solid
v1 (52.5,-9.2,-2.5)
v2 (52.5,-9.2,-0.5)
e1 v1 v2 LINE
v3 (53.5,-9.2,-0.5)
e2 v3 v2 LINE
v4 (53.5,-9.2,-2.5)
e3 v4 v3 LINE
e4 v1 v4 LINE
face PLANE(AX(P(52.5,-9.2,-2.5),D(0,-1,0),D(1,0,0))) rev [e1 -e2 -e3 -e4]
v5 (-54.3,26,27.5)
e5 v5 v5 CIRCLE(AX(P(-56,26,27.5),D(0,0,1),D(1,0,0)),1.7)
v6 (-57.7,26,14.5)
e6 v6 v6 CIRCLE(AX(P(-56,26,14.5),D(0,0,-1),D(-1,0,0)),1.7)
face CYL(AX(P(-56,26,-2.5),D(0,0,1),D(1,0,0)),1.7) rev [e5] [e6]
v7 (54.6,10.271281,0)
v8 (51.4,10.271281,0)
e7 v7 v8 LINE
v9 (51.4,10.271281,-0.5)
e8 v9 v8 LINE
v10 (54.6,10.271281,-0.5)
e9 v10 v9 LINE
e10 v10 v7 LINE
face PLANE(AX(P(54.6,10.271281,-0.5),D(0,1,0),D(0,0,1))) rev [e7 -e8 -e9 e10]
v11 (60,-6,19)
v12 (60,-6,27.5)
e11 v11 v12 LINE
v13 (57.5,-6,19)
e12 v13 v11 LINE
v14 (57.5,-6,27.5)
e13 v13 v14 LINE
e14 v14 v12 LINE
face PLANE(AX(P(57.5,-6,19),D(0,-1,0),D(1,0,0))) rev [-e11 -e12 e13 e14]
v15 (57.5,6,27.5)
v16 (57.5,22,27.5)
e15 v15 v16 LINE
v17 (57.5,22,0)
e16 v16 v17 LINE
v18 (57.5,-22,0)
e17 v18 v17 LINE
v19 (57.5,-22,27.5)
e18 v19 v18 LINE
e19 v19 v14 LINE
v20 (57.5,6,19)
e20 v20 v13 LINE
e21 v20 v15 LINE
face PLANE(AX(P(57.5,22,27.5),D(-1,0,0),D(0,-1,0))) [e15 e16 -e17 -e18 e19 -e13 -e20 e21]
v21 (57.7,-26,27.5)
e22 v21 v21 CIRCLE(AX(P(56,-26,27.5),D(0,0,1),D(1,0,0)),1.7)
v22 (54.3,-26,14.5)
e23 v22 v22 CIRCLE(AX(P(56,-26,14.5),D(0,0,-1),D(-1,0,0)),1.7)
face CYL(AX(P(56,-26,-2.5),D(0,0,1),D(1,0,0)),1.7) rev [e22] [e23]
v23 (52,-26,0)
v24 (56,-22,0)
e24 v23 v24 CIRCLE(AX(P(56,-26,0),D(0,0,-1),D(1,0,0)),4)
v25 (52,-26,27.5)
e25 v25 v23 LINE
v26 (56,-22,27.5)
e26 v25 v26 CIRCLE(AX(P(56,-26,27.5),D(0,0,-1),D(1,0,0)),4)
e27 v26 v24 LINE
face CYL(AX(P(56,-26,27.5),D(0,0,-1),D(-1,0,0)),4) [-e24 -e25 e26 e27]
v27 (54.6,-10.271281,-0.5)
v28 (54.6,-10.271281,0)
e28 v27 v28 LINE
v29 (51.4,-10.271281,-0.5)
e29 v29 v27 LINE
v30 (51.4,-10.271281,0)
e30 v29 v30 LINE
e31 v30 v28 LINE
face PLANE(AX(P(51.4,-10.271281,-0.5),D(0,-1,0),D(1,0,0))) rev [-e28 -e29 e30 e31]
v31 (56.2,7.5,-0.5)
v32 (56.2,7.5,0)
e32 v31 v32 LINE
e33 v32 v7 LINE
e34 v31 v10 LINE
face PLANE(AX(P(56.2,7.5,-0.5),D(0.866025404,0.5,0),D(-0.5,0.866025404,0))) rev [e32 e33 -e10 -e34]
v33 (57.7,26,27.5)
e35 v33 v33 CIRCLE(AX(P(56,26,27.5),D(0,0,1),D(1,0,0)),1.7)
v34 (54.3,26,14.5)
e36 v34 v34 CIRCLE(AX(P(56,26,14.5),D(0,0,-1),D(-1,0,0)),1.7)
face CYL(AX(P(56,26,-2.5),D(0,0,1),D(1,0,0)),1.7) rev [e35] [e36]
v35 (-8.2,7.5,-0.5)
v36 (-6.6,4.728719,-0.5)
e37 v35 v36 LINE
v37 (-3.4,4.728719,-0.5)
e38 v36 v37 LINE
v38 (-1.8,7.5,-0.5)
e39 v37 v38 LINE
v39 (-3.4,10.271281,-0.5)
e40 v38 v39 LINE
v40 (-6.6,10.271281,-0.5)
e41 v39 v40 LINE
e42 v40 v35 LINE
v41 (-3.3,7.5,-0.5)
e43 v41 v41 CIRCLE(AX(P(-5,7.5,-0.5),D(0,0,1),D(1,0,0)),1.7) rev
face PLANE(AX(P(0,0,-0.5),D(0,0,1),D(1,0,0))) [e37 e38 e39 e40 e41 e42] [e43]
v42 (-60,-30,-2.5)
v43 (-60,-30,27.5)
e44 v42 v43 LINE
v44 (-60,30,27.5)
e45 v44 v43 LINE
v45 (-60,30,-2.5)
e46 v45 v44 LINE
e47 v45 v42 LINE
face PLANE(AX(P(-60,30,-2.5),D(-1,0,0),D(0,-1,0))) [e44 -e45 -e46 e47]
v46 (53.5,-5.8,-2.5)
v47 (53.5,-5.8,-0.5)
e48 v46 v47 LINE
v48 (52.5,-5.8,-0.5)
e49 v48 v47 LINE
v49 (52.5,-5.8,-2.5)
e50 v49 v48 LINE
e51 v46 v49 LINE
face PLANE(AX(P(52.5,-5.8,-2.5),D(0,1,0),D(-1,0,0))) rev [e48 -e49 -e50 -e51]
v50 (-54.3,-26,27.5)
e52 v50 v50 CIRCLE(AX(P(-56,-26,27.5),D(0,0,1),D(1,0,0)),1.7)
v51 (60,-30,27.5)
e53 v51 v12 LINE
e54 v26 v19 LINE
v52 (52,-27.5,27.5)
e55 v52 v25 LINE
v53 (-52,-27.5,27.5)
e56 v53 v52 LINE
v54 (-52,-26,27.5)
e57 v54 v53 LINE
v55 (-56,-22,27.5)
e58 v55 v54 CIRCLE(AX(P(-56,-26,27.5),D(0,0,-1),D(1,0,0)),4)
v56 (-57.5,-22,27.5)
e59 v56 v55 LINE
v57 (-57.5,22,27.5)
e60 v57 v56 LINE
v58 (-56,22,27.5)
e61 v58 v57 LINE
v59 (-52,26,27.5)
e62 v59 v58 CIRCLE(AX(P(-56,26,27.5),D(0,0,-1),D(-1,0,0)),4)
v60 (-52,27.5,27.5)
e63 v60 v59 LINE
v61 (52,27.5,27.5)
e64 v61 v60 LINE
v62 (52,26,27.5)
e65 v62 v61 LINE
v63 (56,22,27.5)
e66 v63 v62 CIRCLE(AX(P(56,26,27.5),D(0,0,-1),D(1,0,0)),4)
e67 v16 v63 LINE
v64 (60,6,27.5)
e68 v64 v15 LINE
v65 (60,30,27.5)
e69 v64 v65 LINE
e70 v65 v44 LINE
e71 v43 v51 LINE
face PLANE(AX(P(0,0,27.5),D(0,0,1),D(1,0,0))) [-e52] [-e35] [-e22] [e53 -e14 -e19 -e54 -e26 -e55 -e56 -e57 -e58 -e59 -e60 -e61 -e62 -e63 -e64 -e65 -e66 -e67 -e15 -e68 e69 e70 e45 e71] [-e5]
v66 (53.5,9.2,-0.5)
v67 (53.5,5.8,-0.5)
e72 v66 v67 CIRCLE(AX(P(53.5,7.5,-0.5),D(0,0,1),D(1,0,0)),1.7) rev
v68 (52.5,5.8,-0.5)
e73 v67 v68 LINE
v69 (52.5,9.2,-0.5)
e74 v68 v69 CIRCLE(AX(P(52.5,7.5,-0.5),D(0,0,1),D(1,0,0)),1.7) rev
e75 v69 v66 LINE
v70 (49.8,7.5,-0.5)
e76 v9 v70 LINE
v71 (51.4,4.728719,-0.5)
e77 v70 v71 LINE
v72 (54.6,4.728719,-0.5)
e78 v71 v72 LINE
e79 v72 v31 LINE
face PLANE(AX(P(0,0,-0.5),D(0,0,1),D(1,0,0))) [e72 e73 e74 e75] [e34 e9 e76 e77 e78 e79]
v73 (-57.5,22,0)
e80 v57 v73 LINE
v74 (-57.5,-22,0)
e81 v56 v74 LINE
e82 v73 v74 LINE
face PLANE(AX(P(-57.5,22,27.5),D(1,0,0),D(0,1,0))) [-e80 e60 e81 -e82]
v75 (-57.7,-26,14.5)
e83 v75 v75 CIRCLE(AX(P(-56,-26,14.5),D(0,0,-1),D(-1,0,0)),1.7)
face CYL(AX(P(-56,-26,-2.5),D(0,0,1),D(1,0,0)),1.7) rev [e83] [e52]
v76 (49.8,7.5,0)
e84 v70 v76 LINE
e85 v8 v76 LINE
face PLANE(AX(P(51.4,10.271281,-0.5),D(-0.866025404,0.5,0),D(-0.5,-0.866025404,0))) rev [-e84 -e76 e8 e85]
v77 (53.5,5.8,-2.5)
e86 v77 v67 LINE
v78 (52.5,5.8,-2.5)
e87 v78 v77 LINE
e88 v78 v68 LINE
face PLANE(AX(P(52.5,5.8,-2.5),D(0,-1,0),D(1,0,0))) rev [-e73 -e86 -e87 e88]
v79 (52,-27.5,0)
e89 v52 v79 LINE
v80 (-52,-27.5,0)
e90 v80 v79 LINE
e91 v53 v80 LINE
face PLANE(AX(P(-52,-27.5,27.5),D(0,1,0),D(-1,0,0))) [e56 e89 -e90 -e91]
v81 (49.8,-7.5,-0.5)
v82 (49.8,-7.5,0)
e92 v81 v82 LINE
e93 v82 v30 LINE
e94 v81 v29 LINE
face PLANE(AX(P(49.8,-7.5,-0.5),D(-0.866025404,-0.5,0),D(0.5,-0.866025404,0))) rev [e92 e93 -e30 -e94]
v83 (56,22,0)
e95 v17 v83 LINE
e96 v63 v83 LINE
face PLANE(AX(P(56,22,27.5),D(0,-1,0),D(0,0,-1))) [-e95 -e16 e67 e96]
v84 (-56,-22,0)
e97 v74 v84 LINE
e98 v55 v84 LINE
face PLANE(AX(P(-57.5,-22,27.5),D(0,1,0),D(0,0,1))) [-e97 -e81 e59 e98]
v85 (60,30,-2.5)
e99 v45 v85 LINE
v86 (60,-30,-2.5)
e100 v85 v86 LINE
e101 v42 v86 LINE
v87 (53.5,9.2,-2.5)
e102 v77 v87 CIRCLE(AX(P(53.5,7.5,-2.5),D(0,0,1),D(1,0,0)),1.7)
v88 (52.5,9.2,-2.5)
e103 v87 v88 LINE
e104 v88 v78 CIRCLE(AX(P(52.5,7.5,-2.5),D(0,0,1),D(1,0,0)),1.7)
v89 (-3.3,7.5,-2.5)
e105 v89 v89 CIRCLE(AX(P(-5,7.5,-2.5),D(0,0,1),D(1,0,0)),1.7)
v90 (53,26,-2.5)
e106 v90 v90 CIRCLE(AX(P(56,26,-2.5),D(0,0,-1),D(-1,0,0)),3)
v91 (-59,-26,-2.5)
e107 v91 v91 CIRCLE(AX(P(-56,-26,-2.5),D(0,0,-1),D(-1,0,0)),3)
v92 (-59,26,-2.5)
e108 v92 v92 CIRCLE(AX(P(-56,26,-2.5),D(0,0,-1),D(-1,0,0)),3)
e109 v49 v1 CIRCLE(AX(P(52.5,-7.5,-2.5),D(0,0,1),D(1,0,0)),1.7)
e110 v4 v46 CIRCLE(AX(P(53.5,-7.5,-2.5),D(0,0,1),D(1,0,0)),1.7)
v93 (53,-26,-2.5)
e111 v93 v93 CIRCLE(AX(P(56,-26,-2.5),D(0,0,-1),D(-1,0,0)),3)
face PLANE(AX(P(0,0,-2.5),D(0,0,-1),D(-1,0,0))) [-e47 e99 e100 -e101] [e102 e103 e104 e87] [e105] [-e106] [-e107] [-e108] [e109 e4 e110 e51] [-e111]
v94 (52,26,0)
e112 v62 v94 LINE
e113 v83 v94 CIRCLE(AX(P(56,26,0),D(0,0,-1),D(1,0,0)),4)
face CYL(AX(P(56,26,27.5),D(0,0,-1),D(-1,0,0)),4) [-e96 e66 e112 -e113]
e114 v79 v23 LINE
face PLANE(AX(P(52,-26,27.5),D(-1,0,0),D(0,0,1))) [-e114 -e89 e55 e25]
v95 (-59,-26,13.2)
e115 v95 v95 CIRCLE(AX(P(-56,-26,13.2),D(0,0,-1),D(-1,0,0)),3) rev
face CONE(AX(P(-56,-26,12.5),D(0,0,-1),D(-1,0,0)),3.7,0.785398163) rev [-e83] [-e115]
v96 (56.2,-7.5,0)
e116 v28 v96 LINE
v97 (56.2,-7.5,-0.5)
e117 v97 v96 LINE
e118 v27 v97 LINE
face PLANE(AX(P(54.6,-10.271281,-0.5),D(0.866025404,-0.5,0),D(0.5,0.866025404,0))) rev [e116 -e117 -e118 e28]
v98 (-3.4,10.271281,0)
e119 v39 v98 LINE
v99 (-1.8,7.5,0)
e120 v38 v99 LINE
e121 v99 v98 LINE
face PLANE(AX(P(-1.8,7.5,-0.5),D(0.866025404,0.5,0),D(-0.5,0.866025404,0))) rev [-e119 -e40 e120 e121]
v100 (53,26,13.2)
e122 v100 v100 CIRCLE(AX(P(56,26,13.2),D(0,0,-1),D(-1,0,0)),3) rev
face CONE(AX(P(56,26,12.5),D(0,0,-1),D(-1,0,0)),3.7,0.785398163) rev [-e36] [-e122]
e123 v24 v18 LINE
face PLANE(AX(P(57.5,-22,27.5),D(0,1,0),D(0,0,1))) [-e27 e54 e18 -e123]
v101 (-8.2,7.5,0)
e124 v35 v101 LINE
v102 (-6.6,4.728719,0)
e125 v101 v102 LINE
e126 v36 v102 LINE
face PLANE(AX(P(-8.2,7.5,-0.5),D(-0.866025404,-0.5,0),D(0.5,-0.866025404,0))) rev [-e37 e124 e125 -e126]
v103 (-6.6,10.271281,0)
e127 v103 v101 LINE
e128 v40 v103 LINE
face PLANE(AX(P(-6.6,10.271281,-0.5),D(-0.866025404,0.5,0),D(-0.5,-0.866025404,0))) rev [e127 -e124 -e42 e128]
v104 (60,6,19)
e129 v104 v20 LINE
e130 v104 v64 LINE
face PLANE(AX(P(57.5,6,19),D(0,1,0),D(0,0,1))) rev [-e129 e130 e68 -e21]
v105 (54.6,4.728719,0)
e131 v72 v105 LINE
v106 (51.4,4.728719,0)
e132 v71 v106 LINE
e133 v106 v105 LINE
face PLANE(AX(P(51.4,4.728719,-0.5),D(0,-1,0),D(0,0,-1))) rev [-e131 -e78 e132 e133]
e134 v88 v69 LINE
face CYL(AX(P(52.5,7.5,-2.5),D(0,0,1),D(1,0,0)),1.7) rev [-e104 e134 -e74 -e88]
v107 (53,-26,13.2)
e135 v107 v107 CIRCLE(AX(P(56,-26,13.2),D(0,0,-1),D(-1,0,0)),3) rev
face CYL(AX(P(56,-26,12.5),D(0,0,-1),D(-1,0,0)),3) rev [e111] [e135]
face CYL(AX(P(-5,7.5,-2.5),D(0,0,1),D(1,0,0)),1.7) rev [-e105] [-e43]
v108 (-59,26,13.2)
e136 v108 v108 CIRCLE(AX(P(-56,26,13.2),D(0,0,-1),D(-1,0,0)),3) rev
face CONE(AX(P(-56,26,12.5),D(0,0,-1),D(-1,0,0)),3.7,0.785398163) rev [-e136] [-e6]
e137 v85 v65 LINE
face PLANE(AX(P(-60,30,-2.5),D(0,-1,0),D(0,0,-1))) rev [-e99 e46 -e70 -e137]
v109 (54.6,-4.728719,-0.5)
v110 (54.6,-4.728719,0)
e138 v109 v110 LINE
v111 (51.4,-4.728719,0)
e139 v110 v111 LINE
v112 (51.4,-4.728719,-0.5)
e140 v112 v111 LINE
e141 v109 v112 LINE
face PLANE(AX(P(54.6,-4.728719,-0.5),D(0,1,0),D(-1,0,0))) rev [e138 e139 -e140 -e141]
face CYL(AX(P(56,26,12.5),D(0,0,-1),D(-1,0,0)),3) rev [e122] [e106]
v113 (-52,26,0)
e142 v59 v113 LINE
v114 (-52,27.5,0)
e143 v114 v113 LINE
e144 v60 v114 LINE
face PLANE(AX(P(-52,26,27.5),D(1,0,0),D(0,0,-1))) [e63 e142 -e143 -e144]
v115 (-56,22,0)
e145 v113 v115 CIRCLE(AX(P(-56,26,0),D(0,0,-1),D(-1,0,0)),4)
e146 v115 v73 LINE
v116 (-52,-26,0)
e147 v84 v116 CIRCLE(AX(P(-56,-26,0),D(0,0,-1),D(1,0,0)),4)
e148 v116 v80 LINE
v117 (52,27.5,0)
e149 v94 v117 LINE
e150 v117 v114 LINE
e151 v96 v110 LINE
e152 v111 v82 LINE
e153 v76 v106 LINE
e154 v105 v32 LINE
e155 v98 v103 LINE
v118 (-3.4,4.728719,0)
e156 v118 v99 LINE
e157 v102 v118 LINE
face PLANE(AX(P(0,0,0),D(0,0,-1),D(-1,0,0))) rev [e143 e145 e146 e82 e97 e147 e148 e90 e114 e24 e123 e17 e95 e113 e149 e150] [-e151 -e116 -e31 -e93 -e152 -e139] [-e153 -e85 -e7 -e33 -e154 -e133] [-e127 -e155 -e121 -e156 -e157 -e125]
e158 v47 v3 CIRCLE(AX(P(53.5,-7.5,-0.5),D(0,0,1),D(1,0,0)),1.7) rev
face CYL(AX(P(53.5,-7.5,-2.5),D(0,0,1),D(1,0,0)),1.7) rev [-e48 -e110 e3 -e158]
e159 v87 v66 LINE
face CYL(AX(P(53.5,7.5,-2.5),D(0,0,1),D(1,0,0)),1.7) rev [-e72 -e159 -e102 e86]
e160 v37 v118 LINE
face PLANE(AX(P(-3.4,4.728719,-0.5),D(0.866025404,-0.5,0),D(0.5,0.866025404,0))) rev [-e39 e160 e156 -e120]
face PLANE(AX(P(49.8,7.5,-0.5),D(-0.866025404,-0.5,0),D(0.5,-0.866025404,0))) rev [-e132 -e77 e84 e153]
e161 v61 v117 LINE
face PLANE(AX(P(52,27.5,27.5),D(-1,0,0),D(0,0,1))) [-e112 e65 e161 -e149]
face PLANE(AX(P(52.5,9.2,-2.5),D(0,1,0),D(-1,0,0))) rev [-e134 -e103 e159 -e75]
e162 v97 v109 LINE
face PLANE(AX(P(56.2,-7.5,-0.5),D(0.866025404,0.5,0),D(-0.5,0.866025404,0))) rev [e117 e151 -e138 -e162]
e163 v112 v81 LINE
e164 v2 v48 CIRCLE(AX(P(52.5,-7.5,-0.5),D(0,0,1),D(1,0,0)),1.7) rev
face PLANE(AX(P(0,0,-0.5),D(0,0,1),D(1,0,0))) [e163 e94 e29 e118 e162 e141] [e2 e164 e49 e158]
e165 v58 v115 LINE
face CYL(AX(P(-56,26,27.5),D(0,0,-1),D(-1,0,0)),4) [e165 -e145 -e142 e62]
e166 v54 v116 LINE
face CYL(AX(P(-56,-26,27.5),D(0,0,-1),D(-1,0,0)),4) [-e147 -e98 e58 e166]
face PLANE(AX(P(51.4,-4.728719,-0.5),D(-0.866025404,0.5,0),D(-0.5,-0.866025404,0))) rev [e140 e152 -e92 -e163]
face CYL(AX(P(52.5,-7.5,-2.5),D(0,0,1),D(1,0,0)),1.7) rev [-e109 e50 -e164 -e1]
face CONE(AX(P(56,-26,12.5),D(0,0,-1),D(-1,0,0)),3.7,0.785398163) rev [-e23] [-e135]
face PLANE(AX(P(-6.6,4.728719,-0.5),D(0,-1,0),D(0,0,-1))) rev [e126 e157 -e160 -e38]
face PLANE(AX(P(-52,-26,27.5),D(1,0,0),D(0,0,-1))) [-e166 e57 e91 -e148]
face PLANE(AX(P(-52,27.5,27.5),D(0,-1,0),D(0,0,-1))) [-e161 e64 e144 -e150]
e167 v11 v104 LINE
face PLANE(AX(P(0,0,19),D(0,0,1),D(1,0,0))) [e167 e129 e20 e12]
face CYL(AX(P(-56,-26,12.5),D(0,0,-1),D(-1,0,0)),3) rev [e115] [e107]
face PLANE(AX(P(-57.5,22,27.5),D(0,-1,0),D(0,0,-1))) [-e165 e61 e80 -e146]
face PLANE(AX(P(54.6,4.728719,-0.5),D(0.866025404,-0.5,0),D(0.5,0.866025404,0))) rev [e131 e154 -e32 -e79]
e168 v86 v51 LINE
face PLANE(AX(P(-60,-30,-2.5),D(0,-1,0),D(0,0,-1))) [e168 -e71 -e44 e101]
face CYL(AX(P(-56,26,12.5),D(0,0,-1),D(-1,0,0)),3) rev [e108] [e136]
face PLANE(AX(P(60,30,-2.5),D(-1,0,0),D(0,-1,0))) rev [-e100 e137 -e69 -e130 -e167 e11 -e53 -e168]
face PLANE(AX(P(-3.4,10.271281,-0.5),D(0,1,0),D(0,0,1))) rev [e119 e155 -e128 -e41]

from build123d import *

# Parameters (mm, degrees)
SKETCH_1_W          = 120
SKETCH_1_H          = 60
EXTRUDE_1_DEPTH     = 2.5
SKETCH_1_3_W        = 120
SKETCH_1_3_H        = 60
EXTRUDE_2_DEPTH     = 27.5
SKETCH_2_R          = 1.7
CUT_EXTRUDE_1_DEPTH = 74.484692283
SKETCH_3_R          = 1.7
CUT_EXTRUDE_2_DEPTH = 73.5
CUT_EXTRUDE_3_DEPTH = 0.5
SKETCH_5_W          = 2.5
SKETCH_5_H          = 12
CUT_EXTRUDE_4_DEPTH = 8.5
SKETCH_6_R          = 3
CUT_EXTRUDE_5_DEPTH = 15
CHAMFER_1_SIZE      = 2


with BuildPart() as part:
    # 草图1 → 凸台-拉伸1 (new body)
    with BuildSketch(Plane.XY):
        Rectangle(SKETCH_1_W, SKETCH_1_H)
    extrude(amount=-EXTRUDE_1_DEPTH)

    # 草图1<3> → 凸台-拉伸2 (add)
    with BuildSketch(Plane.XY):
        Rectangle(SKETCH_1_3_W, SKETCH_1_3_H)
        with BuildLine():
            Line((-52, 27.5), (52, 27.5))
            Line((52, 27.5), (52, 26))
            ThreePointArc((52, 26), (53.171572875, 23.171572875), (56, 22))
            Line((56, 22), (57.5, 22))
            Line((57.5, 22), (57.5, -22))
            Line((57.5, -22), (56, -22))
            ThreePointArc((56, -22), (53.171572875, -23.171572875), (52, -26))
            Line((52, -26), (52, -27.5))
            Line((52, -27.5), (-52, -27.5))
            Line((-52, -27.5), (-52, -26))
            ThreePointArc((-52, -26), (-53.171572875, -23.171572875), (-56, -22))
            Line((-56, -22), (-57.5, -22))
            Line((-57.5, -22), (-57.5, 22))
            Line((-57.5, 22), (-56, 22))
            ThreePointArc((-56, 22), (-53.171572875, 23.171572875), (-52, 26))
            Line((-52, 26), (-52, 27.5))
        make_face(mode=Mode.SUBTRACT)
    extrude(amount=EXTRUDE_2_DEPTH)

    # 草图2 → 切除-拉伸1 (cut, through all)
    with BuildSketch(Plane.XY.offset(27.5)):
        with Locations((-56, 26)):
            Circle(SKETCH_2_R)
        with Locations((56, 26)):
            Circle(SKETCH_2_R)
        with Locations((56, -26)):
            Circle(SKETCH_2_R)
        with Locations((-56, -26)):
            Circle(SKETCH_2_R)
    extrude(amount=-CUT_EXTRUDE_1_DEPTH, mode=Mode.SUBTRACT)

    # 草图3 → 切除-拉伸2 (cut, through all)
    with BuildSketch(Plane.XY):
        with Locations((-5, 7.5)):
            Circle(SKETCH_3_R)
        with BuildLine():
            Line((52.5, 9.2), (53.5, 9.2))
            ThreePointArc((53.5, 9.2), (55.2, 7.5), (53.5, 5.8))
            Line((53.5, 5.8), (52.5, 5.8))
            ThreePointArc((52.5, 5.8), (50.8, 7.5), (52.5, 9.2))
        make_face()
        with BuildLine():
            Line((52.5, -5.8), (53.5, -5.8))
            ThreePointArc((53.5, -5.8), (55.2, -7.5), (53.5, -9.2))
            Line((53.5, -9.2), (52.5, -9.2))
            ThreePointArc((52.5, -9.2), (50.8, -7.5), (52.5, -5.8))
        make_face()
    extrude(amount=-CUT_EXTRUDE_2_DEPTH, mode=Mode.SUBTRACT)

    # 草图4 → 切除-拉伸3 (cut)
    with BuildSketch(Plane.XY):
        Polygon((-1.8, 7.5), (-3.4, 10.271281292), (-6.6, 10.271281292), (-8.2, 7.5), (-6.6, 4.728718708), (-3.4, 4.728718708), align=None)
        Polygon((56.2, 7.5), (54.6, 10.271281292), (51.4, 10.271281292), (49.8, 7.5), (51.4, 4.728718708), (54.6, 4.728718708), align=None)
        Polygon((56.2, -7.5), (54.6, -4.728718708), (51.4, -4.728718708), (49.8, -7.5), (51.4, -10.271281292), (54.6, -10.271281292), align=None)
    extrude(amount=-CUT_EXTRUDE_3_DEPTH, mode=Mode.SUBTRACT)

    # 草图5 → 切除-拉伸4 (cut)
    with BuildSketch(Plane.XY.offset(27.5)):
        with Locations((58.75, 0)):
            Rectangle(SKETCH_5_W, SKETCH_5_H)
    extrude(amount=-CUT_EXTRUDE_4_DEPTH, mode=Mode.SUBTRACT)

    # 草图6 → 切除-拉伸5 (cut)
    with BuildSketch(Plane(origin=(0, 0, -2.5), x_dir=(-1, 0, 0), z_dir=(0, 0, -1))):
        with Locations((-56, 26)):
            Circle(SKETCH_6_R)
        with Locations((-56, -26)):
            Circle(SKETCH_6_R)
        with Locations((56, -26)):
            Circle(SKETCH_6_R)
        with Locations((56, 26)):
            Circle(SKETCH_6_R)
    extrude(amount=-CUT_EXTRUDE_5_DEPTH, mode=Mode.SUBTRACT)

    # 倒角1
    # the kernel refuses this chamfer: 2 mm, written as the material it takes off along each edge
    with BuildSketch(Plane(origin=(-56, 26, 12.5), x_dir=(1, 0, 0), z_dir=(0, -1, 0))) as chamfer_1_piece_1_section:
        Polygon((1.7, CHAMFER_1_SIZE), (1.7 + CHAMFER_1_SIZE, 0), (1.7, 0), align=None)
    chamfer_1_piece_1 = revolve(axis=Axis((-56, 26, 12.5), (0, 0, 1)), mode=Mode.PRIVATE)
    chamfer_1_piece_1 = chamfer_1_piece_1 & Plane(origin=(-56, 26, 13.857190975), x_dir=(-1, 0, 0), z_dir=(0, 0, -1)) * Cylinder(3, 15, mode=Mode.PRIVATE)
    add(chamfer_1_piece_1, mode=Mode.SUBTRACT)
    with BuildSketch(Plane(origin=(-56, -26, 12.5), x_dir=(1, 0, 0), z_dir=(0, -1, 0))) as chamfer_1_piece_2_section:
        Polygon((1.7, CHAMFER_1_SIZE), (1.7 + CHAMFER_1_SIZE, 0), (1.7, 0), align=None)
    chamfer_1_piece_2 = revolve(axis=Axis((-56, -26, 12.5), (0, 0, 1)), mode=Mode.PRIVATE)
    chamfer_1_piece_2 = chamfer_1_piece_2 & Plane(origin=(-56, -26, 13.857190975), x_dir=(-1, 0, 0), z_dir=(0, 0, -1)) * Cylinder(3, 15, mode=Mode.PRIVATE)
    add(chamfer_1_piece_2, mode=Mode.SUBTRACT)
    with BuildSketch(Plane(origin=(56, -26, 12.5), x_dir=(1, 0, 0), z_dir=(0, -1, 0))) as chamfer_1_piece_3_section:
        Polygon((1.7, CHAMFER_1_SIZE), (1.7 + CHAMFER_1_SIZE, 0), (1.7, 0), align=None)
    chamfer_1_piece_3 = revolve(axis=Axis((56, -26, 12.5), (0, 0, 1)), mode=Mode.PRIVATE)
    chamfer_1_piece_3 = chamfer_1_piece_3 & Plane(origin=(56, -26, 13.857190975), x_dir=(-1, 0, 0), z_dir=(0, 0, -1)) * Cylinder(3, 15, mode=Mode.PRIVATE)
    add(chamfer_1_piece_3, mode=Mode.SUBTRACT)
    with BuildSketch(Plane(origin=(56, 26, 12.5), x_dir=(1, 0, 0), z_dir=(0, -1, 0))) as chamfer_1_piece_4_section:
        Polygon((1.7, CHAMFER_1_SIZE), (1.7 + CHAMFER_1_SIZE, 0), (1.7, 0), align=None)
    chamfer_1_piece_4 = revolve(axis=Axis((56, 26, 12.5), (0, 0, 1)), mode=Mode.PRIVATE)
    chamfer_1_piece_4 = chamfer_1_piece_4 & Plane(origin=(56, 26, 13.857190975), x_dir=(-1, 0, 0), z_dir=(0, 0, -1)) * Cylinder(3, 15, mode=Mode.PRIVATE)
    add(chamfer_1_piece_4, mode=Mode.SUBTRACT)


solid = part.part
